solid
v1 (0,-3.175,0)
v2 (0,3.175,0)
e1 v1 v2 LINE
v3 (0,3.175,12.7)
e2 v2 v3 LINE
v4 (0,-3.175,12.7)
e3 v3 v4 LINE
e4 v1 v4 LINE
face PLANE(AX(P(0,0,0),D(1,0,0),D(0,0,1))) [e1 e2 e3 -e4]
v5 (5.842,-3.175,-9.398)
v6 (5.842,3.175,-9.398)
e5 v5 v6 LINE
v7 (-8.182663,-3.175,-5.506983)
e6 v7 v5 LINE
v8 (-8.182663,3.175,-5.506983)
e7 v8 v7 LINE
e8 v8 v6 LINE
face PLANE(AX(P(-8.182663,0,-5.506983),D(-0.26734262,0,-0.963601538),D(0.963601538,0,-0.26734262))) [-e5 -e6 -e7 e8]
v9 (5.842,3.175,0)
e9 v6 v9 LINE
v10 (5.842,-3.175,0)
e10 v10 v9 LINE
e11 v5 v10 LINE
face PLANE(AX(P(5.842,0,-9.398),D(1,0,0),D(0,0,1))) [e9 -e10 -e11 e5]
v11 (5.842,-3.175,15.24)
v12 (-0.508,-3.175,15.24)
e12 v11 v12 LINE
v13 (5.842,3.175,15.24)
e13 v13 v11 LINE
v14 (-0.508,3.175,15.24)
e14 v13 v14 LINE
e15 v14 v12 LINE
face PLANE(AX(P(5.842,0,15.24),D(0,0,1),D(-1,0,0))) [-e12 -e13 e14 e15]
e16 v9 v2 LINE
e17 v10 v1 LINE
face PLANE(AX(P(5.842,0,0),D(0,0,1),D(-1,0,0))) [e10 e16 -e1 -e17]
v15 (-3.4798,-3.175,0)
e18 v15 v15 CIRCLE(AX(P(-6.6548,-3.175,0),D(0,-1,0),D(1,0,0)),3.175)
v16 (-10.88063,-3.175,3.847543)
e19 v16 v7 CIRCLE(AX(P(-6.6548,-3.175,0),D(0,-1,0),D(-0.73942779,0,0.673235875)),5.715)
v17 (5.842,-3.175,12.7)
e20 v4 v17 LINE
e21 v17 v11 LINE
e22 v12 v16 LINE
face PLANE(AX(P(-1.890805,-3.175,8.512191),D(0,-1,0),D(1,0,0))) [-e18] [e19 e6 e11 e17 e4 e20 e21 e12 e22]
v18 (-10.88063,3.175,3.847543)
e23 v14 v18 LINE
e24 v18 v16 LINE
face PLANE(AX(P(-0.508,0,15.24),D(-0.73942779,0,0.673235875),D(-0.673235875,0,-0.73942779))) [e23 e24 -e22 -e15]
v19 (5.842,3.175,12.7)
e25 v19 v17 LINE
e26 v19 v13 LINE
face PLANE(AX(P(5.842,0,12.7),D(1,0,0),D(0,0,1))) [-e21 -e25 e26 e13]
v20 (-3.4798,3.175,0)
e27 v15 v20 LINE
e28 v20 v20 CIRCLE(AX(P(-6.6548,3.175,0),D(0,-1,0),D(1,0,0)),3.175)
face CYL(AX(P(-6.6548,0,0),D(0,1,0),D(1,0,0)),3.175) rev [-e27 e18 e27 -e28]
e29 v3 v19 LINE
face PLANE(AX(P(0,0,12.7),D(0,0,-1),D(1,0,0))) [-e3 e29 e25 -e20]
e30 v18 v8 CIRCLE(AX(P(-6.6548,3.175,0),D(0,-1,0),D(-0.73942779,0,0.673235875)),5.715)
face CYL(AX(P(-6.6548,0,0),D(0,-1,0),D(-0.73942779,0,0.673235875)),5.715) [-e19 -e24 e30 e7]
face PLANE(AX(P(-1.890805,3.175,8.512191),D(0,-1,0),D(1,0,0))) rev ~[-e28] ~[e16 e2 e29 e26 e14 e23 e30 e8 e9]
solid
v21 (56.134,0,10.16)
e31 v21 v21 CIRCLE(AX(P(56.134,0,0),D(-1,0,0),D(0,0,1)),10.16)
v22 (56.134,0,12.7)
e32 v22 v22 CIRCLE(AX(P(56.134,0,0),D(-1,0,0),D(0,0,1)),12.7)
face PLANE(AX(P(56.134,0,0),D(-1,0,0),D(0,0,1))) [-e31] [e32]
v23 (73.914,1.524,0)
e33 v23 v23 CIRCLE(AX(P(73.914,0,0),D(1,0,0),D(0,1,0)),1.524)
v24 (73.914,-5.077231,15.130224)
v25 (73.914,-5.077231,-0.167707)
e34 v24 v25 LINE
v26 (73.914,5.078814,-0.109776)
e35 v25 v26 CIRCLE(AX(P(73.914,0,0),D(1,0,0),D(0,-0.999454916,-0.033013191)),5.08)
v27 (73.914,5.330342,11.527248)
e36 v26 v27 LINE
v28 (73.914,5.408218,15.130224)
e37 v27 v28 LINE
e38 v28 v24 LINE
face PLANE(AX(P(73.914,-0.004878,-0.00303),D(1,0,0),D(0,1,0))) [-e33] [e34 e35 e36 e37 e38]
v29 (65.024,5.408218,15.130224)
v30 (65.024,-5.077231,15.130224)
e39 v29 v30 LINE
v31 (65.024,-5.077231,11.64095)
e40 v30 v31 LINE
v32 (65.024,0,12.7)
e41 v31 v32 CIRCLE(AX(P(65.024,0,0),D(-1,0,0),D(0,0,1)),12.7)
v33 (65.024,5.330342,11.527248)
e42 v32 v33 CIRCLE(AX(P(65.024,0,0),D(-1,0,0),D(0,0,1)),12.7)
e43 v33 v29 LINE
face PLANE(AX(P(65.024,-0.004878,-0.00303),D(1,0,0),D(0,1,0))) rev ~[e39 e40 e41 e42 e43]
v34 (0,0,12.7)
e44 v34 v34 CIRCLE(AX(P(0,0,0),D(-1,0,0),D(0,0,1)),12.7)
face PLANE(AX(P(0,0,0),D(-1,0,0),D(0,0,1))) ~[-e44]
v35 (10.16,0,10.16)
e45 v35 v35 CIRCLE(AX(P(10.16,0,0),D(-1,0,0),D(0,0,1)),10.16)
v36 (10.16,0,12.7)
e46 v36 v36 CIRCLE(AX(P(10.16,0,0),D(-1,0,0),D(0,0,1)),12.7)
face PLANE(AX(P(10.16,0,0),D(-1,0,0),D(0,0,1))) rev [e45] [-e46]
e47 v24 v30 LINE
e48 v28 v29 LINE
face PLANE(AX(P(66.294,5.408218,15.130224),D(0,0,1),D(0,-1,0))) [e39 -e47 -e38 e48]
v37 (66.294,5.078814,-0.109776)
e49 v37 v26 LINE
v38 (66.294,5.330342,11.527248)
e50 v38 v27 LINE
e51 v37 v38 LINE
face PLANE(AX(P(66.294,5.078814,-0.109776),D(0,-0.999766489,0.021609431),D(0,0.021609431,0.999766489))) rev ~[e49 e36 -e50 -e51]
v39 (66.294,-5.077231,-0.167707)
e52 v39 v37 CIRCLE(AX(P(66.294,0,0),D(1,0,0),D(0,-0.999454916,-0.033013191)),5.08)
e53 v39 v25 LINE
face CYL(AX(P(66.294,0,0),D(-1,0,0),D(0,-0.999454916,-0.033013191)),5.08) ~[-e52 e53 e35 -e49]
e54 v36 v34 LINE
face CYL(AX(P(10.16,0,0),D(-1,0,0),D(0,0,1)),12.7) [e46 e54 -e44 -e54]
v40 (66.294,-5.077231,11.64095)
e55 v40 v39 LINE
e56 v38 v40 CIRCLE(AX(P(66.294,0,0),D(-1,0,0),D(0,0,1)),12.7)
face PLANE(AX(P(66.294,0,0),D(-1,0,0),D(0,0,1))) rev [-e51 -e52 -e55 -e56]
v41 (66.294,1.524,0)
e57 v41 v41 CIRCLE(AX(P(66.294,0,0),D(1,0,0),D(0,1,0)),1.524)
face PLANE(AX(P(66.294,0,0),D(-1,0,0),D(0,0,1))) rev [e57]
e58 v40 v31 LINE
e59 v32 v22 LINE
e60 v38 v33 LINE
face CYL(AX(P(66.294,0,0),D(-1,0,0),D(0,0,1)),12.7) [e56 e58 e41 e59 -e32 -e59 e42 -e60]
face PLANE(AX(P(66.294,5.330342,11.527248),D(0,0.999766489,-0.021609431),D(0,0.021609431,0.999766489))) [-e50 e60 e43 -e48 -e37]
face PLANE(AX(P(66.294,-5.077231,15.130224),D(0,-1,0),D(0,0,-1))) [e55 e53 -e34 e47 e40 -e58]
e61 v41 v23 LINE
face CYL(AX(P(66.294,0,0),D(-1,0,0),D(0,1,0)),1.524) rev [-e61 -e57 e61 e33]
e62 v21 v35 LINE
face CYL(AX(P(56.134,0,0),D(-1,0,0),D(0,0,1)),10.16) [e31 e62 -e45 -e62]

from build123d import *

# Parameters (mm, degrees)
F0_W          = 5.842
F0_H          = 12.7
F0_R          = 3.175
F2_DEPTH      = 3.175
F3_R          = 1.524
F4_DEPTH      = 7.62
F4_DEPTH_BACK = 1.27


with BuildPart() as f1:
    # F0 (on Front) → F1 (revolve)
    with BuildSketch(Plane.XZ):
        with Locations((2.921, 6.35)):
            Rectangle(F0_W, F0_H)
        Polygon((5.842, 12.7), (5.842, 0), (66.294, 0), (66.294, 12.7), (56.134, 12.7), (56.134, 10.16), (10.16, 10.16), (10.16, 12.7), align=None)
    revolve(axis=Axis((33.147, 0, 0), (-1, 0, 0)))

    # F3 (on face) → F4 (join, two sides)
    with BuildSketch(Plane.YZ.offset(66.294)) as f4_sk:
        with BuildLine():
            Line((-5.0772309735, 0.1677070124), (-5.0772309735, -0.1677070124))
            ThreePointArc((-5.0772309735, -0.1677070124), (0.0289763613, -5.0799173586), (5.0788137641, -0.1097759081))
            ThreePointArc((5.0788137641, -0.1097759081), (5.0797034324, -0.0548911586), (5.08, 0))
            ThreePointArc((5.08, 0), (0.0838649353, 5.0793076962), (-5.0772309735, 0.1677070124))
        make_face()
        Circle(F3_R, mode=Mode.SUBTRACT)
        with BuildLine():
            ThreePointArc((5.08, 0), (5.0797034324, -0.0548911586), (5.0788137641, -0.1097759081))
            Line((5.0788137641, -0.1097759081), (5.3303419683, 11.5272483491))
            ThreePointArc((5.3303419683, 11.5272483491), (0.1387383567, 12.6992421691), (-5.0772309735, 11.6409503754))
            Line((-5.0772309735, 11.6409503754), (-5.0772309735, 0.1677070124))
            ThreePointArc((-5.0772309735, 0.1677070124), (0.0838649353, 5.0793076962), (5.08, 0))
        make_face()
        with BuildLine():
            ThreePointArc((-5.0772309735, 11.6409503754), (0.1387383567, 12.6992421691), (5.3303419683, 11.5272483491))
            Line((5.3303419683, 11.5272483491), (5.408218408, 15.1302240919))
            Line((5.408218408, 15.1302240919), (-5.0772309735, 15.1302240919))
            Line((-5.0772309735, 15.1302240919), (-5.0772309735, 11.6409503754))
        make_face()
    extrude(amount=F4_DEPTH)
    extrude(f4_sk.sketch, amount=-F4_DEPTH_BACK)


with BuildPart() as f2:
    # F0 (on Front) → F2 (new body, symmetric)
    with BuildSketch(Plane.XZ):
        with BuildLine():
            Line((-0.9398, 0), (0, 0))
            Line((0, 0), (0, 12.7))
            Line((0, 12.7), (5.842, 12.7))
            Line((5.842, 12.7), (5.842, 15.24))
            Line((5.842, 15.24), (-0.508, 15.24))
            Line((-0.508, 15.24), (-10.8806298187, 3.8475430269))
            ThreePointArc((-10.8806298187, 3.8475430269), (-4.5919612295, 5.3297205562), (-0.9398, 0))
        make_face()
        with BuildLine():
            ThreePointArc((-8.1826630726, -5.5069827884), (-3.1957909266, -4.5493385486), (-0.9398, 0))
            ThreePointArc((-0.9398, 0), (-4.5919612295, 5.3297205562), (-10.8806298187, 3.8475430269))
            ThreePointArc((-10.8806298187, 3.8475430269), (-12.1459778134, -1.5837270034), (-8.1826630726, -5.5069827884))
        make_face()
        with Locations((-6.6548, 0)):
            Circle(F0_R, mode=Mode.SUBTRACT)
        with BuildLine():
            Line((5.842, 0), (0, 0))
            Line((0, 0), (-0.9398, 0))
            ThreePointArc((-0.9398, 0), (-3.1957909266, -4.5493385486), (-8.1826630726, -5.5069827884))
            Line((-8.1826630726, -5.5069827884), (5.842, -9.398))
            Line((5.842, -9.398), (5.842, 0))
        make_face()
    extrude(amount=F2_DEPTH, both=True)


solid = Compound([f1.part, f2.part])
